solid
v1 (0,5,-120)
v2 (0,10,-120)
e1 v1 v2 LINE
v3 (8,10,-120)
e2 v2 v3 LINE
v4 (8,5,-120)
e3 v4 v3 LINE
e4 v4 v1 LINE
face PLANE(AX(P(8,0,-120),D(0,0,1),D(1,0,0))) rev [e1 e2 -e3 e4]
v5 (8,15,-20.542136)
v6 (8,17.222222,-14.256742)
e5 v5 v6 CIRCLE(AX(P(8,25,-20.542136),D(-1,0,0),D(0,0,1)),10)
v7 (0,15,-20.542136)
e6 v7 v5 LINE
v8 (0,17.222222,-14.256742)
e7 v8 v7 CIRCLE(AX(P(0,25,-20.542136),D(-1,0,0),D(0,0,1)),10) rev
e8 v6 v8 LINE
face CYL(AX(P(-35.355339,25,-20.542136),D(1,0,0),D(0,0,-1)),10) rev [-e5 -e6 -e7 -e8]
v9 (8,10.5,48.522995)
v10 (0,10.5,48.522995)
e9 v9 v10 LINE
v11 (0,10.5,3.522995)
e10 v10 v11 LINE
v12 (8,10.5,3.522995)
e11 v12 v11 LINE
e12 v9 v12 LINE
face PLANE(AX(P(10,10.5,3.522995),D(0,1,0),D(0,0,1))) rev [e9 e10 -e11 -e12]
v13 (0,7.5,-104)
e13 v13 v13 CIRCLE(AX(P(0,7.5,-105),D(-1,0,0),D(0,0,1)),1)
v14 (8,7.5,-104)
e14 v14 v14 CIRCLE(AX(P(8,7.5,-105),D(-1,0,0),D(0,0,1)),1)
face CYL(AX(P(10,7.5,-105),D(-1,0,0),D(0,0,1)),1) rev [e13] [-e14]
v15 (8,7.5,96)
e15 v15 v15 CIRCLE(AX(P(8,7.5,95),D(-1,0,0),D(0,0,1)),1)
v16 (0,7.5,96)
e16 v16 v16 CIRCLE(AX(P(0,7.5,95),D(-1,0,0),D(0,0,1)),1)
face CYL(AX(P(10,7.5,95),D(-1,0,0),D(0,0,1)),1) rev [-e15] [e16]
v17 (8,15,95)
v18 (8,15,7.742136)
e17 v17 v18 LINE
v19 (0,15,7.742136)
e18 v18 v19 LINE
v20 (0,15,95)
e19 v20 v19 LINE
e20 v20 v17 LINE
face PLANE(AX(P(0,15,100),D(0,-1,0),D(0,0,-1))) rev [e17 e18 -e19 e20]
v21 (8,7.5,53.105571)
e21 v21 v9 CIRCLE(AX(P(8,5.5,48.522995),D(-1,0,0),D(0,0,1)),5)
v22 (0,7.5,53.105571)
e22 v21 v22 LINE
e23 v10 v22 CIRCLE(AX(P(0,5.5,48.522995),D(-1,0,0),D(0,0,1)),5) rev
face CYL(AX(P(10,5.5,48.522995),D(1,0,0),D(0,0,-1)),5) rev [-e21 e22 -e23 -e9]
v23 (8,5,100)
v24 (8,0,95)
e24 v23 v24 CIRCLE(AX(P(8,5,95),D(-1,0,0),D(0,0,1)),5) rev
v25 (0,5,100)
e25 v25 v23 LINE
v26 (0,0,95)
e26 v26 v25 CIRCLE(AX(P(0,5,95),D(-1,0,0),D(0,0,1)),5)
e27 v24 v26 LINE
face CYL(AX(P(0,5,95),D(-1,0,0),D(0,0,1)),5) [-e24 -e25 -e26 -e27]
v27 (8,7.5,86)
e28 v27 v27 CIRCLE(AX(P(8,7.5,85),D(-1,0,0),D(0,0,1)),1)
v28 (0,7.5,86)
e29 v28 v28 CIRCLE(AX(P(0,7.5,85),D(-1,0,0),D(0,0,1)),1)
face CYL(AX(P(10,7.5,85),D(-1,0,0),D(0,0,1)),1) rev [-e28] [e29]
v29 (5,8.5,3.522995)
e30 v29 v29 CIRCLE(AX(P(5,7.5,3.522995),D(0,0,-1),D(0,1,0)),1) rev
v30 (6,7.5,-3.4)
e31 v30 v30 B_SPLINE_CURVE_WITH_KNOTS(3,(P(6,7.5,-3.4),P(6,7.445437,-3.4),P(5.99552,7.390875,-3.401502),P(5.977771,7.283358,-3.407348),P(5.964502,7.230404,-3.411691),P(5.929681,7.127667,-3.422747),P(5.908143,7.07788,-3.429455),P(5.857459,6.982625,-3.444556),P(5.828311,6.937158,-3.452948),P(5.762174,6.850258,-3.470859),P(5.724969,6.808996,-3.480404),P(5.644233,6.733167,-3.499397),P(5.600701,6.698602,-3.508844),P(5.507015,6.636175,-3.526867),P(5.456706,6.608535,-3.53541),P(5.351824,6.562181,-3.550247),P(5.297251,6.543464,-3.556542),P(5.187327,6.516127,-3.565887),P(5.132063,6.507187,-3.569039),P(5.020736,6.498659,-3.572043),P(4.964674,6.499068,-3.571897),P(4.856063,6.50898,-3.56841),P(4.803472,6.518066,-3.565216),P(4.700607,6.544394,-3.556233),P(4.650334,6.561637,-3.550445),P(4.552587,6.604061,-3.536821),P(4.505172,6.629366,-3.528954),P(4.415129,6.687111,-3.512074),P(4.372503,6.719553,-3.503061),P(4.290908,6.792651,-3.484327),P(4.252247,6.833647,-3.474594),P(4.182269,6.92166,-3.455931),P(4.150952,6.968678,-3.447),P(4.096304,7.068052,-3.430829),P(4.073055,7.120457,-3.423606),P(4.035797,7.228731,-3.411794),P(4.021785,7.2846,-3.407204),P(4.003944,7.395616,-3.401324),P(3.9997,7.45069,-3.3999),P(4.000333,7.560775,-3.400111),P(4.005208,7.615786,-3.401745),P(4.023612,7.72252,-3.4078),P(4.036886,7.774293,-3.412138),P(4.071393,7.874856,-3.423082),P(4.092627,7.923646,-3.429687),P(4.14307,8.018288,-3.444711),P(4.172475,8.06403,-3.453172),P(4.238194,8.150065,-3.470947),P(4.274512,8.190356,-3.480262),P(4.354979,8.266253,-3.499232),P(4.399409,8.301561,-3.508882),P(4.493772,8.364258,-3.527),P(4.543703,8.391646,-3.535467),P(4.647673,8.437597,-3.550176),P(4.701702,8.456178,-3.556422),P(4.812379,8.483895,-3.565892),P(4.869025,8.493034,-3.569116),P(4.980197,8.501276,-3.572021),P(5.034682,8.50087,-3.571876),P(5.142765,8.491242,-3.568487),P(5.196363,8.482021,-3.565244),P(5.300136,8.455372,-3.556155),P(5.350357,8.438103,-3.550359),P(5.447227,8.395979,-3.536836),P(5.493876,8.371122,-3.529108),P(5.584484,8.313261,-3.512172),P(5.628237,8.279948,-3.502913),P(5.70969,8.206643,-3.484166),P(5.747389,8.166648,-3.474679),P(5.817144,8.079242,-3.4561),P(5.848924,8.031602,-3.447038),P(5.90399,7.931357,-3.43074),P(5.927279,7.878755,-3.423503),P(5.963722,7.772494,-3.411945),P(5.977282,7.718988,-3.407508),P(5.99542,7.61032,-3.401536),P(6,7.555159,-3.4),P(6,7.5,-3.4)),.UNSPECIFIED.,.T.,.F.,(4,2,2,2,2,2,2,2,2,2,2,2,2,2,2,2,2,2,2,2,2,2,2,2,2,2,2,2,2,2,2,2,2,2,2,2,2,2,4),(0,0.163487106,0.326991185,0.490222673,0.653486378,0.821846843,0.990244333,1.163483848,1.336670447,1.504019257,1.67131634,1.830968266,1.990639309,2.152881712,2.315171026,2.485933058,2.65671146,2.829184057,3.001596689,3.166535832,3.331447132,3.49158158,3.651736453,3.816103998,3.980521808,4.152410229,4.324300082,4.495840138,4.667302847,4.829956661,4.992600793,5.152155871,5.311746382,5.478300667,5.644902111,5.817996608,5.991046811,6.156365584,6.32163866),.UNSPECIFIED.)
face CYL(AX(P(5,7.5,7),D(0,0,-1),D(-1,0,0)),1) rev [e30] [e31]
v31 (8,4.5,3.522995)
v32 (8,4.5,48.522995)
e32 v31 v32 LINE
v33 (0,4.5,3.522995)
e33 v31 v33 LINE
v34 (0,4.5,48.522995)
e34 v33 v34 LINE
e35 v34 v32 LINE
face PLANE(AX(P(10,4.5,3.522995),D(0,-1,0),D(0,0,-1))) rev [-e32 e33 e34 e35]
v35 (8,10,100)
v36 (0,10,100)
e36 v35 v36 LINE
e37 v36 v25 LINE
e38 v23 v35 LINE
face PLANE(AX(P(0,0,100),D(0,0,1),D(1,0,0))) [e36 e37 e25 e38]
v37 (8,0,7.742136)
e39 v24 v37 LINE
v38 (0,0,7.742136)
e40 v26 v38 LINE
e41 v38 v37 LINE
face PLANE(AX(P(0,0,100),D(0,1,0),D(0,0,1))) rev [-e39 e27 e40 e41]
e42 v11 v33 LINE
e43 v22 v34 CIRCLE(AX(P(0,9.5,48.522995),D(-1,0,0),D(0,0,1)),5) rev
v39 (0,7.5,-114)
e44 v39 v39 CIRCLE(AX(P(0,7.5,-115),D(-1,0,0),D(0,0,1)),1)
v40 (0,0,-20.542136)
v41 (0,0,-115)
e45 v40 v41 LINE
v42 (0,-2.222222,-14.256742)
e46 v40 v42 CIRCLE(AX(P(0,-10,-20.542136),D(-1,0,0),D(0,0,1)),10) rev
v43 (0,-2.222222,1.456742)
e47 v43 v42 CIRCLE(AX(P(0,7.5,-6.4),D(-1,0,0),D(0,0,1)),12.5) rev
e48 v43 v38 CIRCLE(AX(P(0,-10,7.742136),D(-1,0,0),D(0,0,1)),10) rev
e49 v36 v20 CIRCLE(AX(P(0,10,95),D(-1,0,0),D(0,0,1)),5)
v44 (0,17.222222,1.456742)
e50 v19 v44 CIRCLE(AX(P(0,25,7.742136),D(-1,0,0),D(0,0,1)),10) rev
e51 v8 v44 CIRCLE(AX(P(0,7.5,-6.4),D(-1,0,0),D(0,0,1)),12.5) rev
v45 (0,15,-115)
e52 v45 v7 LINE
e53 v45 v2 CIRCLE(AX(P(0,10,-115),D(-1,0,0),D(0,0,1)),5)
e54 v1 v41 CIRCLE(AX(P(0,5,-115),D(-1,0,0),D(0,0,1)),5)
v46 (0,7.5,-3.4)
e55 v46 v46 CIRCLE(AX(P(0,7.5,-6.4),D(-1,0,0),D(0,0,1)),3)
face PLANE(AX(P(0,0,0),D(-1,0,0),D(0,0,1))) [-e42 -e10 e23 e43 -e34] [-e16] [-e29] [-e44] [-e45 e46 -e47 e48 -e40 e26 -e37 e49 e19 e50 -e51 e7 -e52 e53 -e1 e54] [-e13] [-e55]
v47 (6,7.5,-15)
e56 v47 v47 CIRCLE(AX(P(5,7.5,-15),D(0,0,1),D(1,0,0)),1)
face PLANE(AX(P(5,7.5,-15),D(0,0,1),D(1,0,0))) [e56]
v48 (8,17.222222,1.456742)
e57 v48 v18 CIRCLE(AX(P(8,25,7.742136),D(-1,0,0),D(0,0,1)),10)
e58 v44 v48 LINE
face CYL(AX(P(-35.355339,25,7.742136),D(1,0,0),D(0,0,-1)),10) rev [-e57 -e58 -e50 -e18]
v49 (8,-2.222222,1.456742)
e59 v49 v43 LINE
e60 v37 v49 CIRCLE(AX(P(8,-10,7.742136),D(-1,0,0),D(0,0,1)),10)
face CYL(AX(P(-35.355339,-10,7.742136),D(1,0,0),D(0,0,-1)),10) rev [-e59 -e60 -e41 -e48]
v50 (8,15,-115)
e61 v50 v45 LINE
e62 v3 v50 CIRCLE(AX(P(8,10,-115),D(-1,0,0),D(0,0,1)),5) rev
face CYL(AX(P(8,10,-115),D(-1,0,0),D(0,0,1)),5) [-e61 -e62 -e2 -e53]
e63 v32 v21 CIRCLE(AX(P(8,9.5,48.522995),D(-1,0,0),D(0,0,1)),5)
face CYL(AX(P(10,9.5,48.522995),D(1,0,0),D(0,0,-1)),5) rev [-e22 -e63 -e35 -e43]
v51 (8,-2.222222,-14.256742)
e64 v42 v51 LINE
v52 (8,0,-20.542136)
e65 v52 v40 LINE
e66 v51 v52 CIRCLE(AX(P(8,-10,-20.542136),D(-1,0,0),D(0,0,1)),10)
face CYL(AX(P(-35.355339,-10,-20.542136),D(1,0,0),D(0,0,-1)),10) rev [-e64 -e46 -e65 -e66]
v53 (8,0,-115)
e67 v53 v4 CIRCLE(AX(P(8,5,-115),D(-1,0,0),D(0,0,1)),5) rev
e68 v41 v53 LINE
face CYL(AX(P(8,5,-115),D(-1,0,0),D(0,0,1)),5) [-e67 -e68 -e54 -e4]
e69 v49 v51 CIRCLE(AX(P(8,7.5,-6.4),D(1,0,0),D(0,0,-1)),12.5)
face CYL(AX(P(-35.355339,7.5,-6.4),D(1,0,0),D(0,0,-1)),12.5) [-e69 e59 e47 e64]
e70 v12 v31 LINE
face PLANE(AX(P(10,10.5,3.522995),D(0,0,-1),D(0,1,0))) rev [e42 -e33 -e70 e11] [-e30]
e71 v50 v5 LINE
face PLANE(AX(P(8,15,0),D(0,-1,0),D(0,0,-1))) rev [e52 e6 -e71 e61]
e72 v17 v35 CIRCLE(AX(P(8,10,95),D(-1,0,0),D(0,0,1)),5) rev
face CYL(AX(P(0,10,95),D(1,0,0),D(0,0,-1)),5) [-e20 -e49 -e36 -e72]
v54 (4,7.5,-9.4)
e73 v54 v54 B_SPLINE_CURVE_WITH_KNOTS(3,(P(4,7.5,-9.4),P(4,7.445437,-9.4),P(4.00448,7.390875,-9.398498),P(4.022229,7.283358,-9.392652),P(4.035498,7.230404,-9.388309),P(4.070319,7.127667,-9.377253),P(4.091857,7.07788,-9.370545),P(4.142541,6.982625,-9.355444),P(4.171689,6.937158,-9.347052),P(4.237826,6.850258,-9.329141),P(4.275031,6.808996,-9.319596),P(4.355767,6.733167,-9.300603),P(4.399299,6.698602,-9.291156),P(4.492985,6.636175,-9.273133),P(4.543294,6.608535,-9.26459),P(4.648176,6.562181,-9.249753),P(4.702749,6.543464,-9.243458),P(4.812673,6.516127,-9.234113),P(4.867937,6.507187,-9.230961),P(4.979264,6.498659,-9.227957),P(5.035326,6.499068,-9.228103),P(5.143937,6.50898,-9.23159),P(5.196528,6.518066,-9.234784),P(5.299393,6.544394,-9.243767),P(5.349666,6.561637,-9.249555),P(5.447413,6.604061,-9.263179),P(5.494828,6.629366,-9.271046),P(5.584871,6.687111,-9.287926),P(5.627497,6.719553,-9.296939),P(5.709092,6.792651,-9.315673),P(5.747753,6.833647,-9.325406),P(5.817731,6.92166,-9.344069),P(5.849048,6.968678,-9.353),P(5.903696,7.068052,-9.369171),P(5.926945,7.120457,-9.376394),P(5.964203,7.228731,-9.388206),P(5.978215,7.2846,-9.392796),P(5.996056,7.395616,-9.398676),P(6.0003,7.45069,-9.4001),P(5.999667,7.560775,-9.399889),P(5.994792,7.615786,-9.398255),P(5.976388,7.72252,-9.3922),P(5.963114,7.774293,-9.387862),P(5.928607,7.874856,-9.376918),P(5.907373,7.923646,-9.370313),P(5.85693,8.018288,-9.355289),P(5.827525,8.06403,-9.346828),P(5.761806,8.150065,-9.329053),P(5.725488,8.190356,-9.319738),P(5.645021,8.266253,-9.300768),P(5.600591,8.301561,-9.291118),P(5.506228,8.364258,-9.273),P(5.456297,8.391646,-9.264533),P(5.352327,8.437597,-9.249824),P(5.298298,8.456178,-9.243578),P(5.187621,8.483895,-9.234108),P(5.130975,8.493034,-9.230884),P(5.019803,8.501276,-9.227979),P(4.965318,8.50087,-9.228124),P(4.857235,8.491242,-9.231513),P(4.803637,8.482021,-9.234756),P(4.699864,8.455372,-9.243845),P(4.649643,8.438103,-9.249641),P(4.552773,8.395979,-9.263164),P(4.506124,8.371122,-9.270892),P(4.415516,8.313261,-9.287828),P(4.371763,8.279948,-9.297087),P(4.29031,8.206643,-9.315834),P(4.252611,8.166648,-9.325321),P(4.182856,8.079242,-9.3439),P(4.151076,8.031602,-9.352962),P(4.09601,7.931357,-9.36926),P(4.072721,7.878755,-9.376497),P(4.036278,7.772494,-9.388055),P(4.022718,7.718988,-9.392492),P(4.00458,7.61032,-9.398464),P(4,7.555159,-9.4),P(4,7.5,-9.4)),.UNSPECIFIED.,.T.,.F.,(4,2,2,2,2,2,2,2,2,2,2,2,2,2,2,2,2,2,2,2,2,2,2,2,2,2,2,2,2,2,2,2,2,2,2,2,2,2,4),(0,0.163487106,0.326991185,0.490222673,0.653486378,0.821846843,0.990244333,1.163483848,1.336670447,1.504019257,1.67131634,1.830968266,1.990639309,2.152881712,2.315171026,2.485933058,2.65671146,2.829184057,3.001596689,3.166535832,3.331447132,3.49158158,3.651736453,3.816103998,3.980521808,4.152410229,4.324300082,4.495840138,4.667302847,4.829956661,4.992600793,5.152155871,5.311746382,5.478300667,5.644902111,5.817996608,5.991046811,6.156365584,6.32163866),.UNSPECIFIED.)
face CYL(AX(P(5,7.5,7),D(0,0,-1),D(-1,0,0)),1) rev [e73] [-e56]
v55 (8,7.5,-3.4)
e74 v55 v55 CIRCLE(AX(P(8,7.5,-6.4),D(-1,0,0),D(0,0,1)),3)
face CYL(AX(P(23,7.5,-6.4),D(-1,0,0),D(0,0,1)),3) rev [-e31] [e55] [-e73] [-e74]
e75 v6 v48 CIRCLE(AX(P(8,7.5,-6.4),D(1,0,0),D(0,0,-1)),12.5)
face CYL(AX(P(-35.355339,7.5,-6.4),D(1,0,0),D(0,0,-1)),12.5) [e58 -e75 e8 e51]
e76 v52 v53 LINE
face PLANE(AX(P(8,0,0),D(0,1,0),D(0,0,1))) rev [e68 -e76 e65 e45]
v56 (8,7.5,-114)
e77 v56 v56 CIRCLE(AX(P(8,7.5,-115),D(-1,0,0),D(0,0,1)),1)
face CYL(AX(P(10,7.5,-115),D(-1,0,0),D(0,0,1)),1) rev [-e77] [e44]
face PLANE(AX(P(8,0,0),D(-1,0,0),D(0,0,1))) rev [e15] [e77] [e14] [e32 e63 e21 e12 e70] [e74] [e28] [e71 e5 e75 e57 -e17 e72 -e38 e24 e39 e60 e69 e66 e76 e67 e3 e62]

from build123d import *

# Parameters (mm, degrees)
SKETCH_1_W               = 120
SKETCH_1_H               = 15
EXTRUDE_1_DEPTH          = 8
FILLET_1_R               = 5
SKETCH_6_R               = 12.5
EXTRUDE_2_DEPTH          = 8
SKETCH_8_R               = 3
CUT_EXTRUDE_5_DEPTH      = 23
SKETCH_9_W               = 8
SKETCH_9_H               = 15
EXTRUDE_3_DEPTH          = 100
SKETCH_10_W              = 50
SKETCH_10_H              = 6
CUT_EXTRUDE_6_DEPTH      = 10
CUT_EXTRUDE_7_DEPTH      = 7
CUT_EXTRUDE_7_DEPTH_BACK = 15
SKETCH_4_R               = 1
FILLET_2_R               = 10
FILLET_4_R               = 5
FILLET_5_R               = 5
SKETCH_11_R              = 1
CUT_EXTRUDE_8_DEPTH      = 10


with BuildPart() as part:
    # 草图1 → 凸台-拉伸1 (new body)
    with BuildSketch(Plane(origin=(0, 0, 0), x_dir=(0, 0, -1), z_dir=(1, 0, 0))):
        with Locations((60, 7.5)):
            Rectangle(SKETCH_1_W, SKETCH_1_H)
    extrude(amount=EXTRUDE_1_DEPTH)

    # 圆角1
    fillet_1_edges = [part.edges().sort_by_distance(p)[0] for p in [
        (4, 15, 0),
        (4, 15, -120),
        (4, 0, -120),
        (4, 0, 0),
    ]]
    fillet(fillet_1_edges, radius=FILLET_1_R)

    # 草图6 → 凸台-拉伸2 (add)
    with BuildSketch(Plane(origin=(8, 0, 0), x_dir=(0, 0, -1), z_dir=(1, 0, 0))):
        with Locations((6.4, 7.5)):
            Circle(SKETCH_6_R)
    extrude(amount=-EXTRUDE_2_DEPTH)

    # 草图8 → 切除-拉伸5 (cut)
    with BuildSketch(Plane.ZY):
        with Locations((-6.4, 7.5)):
            Circle(SKETCH_8_R)
    extrude(amount=-CUT_EXTRUDE_5_DEPTH, mode=Mode.SUBTRACT)

    # 草图9 → 凸台-拉伸3 (add)
    with BuildSketch(Plane.XY):
        with Locations((4, 7.5)):
            Rectangle(SKETCH_9_W, SKETCH_9_H)
    extrude(amount=EXTRUDE_3_DEPTH)

    # 草图10 → 切除-拉伸6 (cut)
    with BuildSketch(Plane.ZY):
        with Locations((28.522995474, 7.5)):
            Rectangle(SKETCH_10_W, SKETCH_10_H)
    extrude(amount=-CUT_EXTRUDE_6_DEPTH, mode=Mode.SUBTRACT)

    # 草图4 → 切除-拉伸7 (cut, two sides: drawn at the far end of the back side and taken through both)
    with BuildSketch(Plane.XY.offset(-CUT_EXTRUDE_7_DEPTH_BACK)):
        with Locations(Location((5, 7.5, 0), (0, 0, 180))):
            Circle(SKETCH_4_R)
    extrude(amount=CUT_EXTRUDE_7_DEPTH + CUT_EXTRUDE_7_DEPTH_BACK, mode=Mode.SUBTRACT)

    # 圆角2
    fillet_2_edges = [part.edges().sort_by_distance(p)[0] for p in [
        (4, 0, -16.4),
        (4, 15, -16.4),
        (4, 15, 3.6),
        (4, 0, 3.6),
    ]]
    fillet(fillet_2_edges, radius=FILLET_2_R)

    # 圆角4
    fillet_4_edges = [part.edges().sort_by_distance(p)[0] for p in [
        (4, 0, 100),
        (4, 15, 100),
    ]]
    fillet(fillet_4_edges, radius=FILLET_4_R)

    # 圆角5
    # the kernel refuses this fillet: 5 mm, written as the material it adds along each edge
    with BuildSketch(Plane(origin=(0, 10.5, 53.522995474), x_dir=(0, 0, -1), z_dir=(1, 0, 0)), Plane(origin=(0, 4.5, 53.522995474), x_dir=(0, 1, 0), z_dir=(1, 0, 0))) as fillet_5_piece_1:
        with BuildLine():
            CenterArc((FILLET_5_R, -FILLET_5_R), FILLET_5_R, 90, 90)
            Line((0, -FILLET_5_R), (0, 0))
            Line((0, 0), (FILLET_5_R, 0))
        make_face()
    extrude(amount=8)

    # 草图11 → 切除-拉伸8 (cut)
    with BuildSketch(Plane.ZY):
        with Locations((-115, 7.5)):
            Circle(SKETCH_11_R)
        with Locations((-105, 7.5)):
            Circle(SKETCH_11_R)
        with Locations((85, 7.5)):
            Circle(SKETCH_11_R)
        with Locations((95, 7.5)):
            Circle(SKETCH_11_R)
    extrude(amount=-CUT_EXTRUDE_8_DEPTH, mode=Mode.SUBTRACT)


solid = part.part
